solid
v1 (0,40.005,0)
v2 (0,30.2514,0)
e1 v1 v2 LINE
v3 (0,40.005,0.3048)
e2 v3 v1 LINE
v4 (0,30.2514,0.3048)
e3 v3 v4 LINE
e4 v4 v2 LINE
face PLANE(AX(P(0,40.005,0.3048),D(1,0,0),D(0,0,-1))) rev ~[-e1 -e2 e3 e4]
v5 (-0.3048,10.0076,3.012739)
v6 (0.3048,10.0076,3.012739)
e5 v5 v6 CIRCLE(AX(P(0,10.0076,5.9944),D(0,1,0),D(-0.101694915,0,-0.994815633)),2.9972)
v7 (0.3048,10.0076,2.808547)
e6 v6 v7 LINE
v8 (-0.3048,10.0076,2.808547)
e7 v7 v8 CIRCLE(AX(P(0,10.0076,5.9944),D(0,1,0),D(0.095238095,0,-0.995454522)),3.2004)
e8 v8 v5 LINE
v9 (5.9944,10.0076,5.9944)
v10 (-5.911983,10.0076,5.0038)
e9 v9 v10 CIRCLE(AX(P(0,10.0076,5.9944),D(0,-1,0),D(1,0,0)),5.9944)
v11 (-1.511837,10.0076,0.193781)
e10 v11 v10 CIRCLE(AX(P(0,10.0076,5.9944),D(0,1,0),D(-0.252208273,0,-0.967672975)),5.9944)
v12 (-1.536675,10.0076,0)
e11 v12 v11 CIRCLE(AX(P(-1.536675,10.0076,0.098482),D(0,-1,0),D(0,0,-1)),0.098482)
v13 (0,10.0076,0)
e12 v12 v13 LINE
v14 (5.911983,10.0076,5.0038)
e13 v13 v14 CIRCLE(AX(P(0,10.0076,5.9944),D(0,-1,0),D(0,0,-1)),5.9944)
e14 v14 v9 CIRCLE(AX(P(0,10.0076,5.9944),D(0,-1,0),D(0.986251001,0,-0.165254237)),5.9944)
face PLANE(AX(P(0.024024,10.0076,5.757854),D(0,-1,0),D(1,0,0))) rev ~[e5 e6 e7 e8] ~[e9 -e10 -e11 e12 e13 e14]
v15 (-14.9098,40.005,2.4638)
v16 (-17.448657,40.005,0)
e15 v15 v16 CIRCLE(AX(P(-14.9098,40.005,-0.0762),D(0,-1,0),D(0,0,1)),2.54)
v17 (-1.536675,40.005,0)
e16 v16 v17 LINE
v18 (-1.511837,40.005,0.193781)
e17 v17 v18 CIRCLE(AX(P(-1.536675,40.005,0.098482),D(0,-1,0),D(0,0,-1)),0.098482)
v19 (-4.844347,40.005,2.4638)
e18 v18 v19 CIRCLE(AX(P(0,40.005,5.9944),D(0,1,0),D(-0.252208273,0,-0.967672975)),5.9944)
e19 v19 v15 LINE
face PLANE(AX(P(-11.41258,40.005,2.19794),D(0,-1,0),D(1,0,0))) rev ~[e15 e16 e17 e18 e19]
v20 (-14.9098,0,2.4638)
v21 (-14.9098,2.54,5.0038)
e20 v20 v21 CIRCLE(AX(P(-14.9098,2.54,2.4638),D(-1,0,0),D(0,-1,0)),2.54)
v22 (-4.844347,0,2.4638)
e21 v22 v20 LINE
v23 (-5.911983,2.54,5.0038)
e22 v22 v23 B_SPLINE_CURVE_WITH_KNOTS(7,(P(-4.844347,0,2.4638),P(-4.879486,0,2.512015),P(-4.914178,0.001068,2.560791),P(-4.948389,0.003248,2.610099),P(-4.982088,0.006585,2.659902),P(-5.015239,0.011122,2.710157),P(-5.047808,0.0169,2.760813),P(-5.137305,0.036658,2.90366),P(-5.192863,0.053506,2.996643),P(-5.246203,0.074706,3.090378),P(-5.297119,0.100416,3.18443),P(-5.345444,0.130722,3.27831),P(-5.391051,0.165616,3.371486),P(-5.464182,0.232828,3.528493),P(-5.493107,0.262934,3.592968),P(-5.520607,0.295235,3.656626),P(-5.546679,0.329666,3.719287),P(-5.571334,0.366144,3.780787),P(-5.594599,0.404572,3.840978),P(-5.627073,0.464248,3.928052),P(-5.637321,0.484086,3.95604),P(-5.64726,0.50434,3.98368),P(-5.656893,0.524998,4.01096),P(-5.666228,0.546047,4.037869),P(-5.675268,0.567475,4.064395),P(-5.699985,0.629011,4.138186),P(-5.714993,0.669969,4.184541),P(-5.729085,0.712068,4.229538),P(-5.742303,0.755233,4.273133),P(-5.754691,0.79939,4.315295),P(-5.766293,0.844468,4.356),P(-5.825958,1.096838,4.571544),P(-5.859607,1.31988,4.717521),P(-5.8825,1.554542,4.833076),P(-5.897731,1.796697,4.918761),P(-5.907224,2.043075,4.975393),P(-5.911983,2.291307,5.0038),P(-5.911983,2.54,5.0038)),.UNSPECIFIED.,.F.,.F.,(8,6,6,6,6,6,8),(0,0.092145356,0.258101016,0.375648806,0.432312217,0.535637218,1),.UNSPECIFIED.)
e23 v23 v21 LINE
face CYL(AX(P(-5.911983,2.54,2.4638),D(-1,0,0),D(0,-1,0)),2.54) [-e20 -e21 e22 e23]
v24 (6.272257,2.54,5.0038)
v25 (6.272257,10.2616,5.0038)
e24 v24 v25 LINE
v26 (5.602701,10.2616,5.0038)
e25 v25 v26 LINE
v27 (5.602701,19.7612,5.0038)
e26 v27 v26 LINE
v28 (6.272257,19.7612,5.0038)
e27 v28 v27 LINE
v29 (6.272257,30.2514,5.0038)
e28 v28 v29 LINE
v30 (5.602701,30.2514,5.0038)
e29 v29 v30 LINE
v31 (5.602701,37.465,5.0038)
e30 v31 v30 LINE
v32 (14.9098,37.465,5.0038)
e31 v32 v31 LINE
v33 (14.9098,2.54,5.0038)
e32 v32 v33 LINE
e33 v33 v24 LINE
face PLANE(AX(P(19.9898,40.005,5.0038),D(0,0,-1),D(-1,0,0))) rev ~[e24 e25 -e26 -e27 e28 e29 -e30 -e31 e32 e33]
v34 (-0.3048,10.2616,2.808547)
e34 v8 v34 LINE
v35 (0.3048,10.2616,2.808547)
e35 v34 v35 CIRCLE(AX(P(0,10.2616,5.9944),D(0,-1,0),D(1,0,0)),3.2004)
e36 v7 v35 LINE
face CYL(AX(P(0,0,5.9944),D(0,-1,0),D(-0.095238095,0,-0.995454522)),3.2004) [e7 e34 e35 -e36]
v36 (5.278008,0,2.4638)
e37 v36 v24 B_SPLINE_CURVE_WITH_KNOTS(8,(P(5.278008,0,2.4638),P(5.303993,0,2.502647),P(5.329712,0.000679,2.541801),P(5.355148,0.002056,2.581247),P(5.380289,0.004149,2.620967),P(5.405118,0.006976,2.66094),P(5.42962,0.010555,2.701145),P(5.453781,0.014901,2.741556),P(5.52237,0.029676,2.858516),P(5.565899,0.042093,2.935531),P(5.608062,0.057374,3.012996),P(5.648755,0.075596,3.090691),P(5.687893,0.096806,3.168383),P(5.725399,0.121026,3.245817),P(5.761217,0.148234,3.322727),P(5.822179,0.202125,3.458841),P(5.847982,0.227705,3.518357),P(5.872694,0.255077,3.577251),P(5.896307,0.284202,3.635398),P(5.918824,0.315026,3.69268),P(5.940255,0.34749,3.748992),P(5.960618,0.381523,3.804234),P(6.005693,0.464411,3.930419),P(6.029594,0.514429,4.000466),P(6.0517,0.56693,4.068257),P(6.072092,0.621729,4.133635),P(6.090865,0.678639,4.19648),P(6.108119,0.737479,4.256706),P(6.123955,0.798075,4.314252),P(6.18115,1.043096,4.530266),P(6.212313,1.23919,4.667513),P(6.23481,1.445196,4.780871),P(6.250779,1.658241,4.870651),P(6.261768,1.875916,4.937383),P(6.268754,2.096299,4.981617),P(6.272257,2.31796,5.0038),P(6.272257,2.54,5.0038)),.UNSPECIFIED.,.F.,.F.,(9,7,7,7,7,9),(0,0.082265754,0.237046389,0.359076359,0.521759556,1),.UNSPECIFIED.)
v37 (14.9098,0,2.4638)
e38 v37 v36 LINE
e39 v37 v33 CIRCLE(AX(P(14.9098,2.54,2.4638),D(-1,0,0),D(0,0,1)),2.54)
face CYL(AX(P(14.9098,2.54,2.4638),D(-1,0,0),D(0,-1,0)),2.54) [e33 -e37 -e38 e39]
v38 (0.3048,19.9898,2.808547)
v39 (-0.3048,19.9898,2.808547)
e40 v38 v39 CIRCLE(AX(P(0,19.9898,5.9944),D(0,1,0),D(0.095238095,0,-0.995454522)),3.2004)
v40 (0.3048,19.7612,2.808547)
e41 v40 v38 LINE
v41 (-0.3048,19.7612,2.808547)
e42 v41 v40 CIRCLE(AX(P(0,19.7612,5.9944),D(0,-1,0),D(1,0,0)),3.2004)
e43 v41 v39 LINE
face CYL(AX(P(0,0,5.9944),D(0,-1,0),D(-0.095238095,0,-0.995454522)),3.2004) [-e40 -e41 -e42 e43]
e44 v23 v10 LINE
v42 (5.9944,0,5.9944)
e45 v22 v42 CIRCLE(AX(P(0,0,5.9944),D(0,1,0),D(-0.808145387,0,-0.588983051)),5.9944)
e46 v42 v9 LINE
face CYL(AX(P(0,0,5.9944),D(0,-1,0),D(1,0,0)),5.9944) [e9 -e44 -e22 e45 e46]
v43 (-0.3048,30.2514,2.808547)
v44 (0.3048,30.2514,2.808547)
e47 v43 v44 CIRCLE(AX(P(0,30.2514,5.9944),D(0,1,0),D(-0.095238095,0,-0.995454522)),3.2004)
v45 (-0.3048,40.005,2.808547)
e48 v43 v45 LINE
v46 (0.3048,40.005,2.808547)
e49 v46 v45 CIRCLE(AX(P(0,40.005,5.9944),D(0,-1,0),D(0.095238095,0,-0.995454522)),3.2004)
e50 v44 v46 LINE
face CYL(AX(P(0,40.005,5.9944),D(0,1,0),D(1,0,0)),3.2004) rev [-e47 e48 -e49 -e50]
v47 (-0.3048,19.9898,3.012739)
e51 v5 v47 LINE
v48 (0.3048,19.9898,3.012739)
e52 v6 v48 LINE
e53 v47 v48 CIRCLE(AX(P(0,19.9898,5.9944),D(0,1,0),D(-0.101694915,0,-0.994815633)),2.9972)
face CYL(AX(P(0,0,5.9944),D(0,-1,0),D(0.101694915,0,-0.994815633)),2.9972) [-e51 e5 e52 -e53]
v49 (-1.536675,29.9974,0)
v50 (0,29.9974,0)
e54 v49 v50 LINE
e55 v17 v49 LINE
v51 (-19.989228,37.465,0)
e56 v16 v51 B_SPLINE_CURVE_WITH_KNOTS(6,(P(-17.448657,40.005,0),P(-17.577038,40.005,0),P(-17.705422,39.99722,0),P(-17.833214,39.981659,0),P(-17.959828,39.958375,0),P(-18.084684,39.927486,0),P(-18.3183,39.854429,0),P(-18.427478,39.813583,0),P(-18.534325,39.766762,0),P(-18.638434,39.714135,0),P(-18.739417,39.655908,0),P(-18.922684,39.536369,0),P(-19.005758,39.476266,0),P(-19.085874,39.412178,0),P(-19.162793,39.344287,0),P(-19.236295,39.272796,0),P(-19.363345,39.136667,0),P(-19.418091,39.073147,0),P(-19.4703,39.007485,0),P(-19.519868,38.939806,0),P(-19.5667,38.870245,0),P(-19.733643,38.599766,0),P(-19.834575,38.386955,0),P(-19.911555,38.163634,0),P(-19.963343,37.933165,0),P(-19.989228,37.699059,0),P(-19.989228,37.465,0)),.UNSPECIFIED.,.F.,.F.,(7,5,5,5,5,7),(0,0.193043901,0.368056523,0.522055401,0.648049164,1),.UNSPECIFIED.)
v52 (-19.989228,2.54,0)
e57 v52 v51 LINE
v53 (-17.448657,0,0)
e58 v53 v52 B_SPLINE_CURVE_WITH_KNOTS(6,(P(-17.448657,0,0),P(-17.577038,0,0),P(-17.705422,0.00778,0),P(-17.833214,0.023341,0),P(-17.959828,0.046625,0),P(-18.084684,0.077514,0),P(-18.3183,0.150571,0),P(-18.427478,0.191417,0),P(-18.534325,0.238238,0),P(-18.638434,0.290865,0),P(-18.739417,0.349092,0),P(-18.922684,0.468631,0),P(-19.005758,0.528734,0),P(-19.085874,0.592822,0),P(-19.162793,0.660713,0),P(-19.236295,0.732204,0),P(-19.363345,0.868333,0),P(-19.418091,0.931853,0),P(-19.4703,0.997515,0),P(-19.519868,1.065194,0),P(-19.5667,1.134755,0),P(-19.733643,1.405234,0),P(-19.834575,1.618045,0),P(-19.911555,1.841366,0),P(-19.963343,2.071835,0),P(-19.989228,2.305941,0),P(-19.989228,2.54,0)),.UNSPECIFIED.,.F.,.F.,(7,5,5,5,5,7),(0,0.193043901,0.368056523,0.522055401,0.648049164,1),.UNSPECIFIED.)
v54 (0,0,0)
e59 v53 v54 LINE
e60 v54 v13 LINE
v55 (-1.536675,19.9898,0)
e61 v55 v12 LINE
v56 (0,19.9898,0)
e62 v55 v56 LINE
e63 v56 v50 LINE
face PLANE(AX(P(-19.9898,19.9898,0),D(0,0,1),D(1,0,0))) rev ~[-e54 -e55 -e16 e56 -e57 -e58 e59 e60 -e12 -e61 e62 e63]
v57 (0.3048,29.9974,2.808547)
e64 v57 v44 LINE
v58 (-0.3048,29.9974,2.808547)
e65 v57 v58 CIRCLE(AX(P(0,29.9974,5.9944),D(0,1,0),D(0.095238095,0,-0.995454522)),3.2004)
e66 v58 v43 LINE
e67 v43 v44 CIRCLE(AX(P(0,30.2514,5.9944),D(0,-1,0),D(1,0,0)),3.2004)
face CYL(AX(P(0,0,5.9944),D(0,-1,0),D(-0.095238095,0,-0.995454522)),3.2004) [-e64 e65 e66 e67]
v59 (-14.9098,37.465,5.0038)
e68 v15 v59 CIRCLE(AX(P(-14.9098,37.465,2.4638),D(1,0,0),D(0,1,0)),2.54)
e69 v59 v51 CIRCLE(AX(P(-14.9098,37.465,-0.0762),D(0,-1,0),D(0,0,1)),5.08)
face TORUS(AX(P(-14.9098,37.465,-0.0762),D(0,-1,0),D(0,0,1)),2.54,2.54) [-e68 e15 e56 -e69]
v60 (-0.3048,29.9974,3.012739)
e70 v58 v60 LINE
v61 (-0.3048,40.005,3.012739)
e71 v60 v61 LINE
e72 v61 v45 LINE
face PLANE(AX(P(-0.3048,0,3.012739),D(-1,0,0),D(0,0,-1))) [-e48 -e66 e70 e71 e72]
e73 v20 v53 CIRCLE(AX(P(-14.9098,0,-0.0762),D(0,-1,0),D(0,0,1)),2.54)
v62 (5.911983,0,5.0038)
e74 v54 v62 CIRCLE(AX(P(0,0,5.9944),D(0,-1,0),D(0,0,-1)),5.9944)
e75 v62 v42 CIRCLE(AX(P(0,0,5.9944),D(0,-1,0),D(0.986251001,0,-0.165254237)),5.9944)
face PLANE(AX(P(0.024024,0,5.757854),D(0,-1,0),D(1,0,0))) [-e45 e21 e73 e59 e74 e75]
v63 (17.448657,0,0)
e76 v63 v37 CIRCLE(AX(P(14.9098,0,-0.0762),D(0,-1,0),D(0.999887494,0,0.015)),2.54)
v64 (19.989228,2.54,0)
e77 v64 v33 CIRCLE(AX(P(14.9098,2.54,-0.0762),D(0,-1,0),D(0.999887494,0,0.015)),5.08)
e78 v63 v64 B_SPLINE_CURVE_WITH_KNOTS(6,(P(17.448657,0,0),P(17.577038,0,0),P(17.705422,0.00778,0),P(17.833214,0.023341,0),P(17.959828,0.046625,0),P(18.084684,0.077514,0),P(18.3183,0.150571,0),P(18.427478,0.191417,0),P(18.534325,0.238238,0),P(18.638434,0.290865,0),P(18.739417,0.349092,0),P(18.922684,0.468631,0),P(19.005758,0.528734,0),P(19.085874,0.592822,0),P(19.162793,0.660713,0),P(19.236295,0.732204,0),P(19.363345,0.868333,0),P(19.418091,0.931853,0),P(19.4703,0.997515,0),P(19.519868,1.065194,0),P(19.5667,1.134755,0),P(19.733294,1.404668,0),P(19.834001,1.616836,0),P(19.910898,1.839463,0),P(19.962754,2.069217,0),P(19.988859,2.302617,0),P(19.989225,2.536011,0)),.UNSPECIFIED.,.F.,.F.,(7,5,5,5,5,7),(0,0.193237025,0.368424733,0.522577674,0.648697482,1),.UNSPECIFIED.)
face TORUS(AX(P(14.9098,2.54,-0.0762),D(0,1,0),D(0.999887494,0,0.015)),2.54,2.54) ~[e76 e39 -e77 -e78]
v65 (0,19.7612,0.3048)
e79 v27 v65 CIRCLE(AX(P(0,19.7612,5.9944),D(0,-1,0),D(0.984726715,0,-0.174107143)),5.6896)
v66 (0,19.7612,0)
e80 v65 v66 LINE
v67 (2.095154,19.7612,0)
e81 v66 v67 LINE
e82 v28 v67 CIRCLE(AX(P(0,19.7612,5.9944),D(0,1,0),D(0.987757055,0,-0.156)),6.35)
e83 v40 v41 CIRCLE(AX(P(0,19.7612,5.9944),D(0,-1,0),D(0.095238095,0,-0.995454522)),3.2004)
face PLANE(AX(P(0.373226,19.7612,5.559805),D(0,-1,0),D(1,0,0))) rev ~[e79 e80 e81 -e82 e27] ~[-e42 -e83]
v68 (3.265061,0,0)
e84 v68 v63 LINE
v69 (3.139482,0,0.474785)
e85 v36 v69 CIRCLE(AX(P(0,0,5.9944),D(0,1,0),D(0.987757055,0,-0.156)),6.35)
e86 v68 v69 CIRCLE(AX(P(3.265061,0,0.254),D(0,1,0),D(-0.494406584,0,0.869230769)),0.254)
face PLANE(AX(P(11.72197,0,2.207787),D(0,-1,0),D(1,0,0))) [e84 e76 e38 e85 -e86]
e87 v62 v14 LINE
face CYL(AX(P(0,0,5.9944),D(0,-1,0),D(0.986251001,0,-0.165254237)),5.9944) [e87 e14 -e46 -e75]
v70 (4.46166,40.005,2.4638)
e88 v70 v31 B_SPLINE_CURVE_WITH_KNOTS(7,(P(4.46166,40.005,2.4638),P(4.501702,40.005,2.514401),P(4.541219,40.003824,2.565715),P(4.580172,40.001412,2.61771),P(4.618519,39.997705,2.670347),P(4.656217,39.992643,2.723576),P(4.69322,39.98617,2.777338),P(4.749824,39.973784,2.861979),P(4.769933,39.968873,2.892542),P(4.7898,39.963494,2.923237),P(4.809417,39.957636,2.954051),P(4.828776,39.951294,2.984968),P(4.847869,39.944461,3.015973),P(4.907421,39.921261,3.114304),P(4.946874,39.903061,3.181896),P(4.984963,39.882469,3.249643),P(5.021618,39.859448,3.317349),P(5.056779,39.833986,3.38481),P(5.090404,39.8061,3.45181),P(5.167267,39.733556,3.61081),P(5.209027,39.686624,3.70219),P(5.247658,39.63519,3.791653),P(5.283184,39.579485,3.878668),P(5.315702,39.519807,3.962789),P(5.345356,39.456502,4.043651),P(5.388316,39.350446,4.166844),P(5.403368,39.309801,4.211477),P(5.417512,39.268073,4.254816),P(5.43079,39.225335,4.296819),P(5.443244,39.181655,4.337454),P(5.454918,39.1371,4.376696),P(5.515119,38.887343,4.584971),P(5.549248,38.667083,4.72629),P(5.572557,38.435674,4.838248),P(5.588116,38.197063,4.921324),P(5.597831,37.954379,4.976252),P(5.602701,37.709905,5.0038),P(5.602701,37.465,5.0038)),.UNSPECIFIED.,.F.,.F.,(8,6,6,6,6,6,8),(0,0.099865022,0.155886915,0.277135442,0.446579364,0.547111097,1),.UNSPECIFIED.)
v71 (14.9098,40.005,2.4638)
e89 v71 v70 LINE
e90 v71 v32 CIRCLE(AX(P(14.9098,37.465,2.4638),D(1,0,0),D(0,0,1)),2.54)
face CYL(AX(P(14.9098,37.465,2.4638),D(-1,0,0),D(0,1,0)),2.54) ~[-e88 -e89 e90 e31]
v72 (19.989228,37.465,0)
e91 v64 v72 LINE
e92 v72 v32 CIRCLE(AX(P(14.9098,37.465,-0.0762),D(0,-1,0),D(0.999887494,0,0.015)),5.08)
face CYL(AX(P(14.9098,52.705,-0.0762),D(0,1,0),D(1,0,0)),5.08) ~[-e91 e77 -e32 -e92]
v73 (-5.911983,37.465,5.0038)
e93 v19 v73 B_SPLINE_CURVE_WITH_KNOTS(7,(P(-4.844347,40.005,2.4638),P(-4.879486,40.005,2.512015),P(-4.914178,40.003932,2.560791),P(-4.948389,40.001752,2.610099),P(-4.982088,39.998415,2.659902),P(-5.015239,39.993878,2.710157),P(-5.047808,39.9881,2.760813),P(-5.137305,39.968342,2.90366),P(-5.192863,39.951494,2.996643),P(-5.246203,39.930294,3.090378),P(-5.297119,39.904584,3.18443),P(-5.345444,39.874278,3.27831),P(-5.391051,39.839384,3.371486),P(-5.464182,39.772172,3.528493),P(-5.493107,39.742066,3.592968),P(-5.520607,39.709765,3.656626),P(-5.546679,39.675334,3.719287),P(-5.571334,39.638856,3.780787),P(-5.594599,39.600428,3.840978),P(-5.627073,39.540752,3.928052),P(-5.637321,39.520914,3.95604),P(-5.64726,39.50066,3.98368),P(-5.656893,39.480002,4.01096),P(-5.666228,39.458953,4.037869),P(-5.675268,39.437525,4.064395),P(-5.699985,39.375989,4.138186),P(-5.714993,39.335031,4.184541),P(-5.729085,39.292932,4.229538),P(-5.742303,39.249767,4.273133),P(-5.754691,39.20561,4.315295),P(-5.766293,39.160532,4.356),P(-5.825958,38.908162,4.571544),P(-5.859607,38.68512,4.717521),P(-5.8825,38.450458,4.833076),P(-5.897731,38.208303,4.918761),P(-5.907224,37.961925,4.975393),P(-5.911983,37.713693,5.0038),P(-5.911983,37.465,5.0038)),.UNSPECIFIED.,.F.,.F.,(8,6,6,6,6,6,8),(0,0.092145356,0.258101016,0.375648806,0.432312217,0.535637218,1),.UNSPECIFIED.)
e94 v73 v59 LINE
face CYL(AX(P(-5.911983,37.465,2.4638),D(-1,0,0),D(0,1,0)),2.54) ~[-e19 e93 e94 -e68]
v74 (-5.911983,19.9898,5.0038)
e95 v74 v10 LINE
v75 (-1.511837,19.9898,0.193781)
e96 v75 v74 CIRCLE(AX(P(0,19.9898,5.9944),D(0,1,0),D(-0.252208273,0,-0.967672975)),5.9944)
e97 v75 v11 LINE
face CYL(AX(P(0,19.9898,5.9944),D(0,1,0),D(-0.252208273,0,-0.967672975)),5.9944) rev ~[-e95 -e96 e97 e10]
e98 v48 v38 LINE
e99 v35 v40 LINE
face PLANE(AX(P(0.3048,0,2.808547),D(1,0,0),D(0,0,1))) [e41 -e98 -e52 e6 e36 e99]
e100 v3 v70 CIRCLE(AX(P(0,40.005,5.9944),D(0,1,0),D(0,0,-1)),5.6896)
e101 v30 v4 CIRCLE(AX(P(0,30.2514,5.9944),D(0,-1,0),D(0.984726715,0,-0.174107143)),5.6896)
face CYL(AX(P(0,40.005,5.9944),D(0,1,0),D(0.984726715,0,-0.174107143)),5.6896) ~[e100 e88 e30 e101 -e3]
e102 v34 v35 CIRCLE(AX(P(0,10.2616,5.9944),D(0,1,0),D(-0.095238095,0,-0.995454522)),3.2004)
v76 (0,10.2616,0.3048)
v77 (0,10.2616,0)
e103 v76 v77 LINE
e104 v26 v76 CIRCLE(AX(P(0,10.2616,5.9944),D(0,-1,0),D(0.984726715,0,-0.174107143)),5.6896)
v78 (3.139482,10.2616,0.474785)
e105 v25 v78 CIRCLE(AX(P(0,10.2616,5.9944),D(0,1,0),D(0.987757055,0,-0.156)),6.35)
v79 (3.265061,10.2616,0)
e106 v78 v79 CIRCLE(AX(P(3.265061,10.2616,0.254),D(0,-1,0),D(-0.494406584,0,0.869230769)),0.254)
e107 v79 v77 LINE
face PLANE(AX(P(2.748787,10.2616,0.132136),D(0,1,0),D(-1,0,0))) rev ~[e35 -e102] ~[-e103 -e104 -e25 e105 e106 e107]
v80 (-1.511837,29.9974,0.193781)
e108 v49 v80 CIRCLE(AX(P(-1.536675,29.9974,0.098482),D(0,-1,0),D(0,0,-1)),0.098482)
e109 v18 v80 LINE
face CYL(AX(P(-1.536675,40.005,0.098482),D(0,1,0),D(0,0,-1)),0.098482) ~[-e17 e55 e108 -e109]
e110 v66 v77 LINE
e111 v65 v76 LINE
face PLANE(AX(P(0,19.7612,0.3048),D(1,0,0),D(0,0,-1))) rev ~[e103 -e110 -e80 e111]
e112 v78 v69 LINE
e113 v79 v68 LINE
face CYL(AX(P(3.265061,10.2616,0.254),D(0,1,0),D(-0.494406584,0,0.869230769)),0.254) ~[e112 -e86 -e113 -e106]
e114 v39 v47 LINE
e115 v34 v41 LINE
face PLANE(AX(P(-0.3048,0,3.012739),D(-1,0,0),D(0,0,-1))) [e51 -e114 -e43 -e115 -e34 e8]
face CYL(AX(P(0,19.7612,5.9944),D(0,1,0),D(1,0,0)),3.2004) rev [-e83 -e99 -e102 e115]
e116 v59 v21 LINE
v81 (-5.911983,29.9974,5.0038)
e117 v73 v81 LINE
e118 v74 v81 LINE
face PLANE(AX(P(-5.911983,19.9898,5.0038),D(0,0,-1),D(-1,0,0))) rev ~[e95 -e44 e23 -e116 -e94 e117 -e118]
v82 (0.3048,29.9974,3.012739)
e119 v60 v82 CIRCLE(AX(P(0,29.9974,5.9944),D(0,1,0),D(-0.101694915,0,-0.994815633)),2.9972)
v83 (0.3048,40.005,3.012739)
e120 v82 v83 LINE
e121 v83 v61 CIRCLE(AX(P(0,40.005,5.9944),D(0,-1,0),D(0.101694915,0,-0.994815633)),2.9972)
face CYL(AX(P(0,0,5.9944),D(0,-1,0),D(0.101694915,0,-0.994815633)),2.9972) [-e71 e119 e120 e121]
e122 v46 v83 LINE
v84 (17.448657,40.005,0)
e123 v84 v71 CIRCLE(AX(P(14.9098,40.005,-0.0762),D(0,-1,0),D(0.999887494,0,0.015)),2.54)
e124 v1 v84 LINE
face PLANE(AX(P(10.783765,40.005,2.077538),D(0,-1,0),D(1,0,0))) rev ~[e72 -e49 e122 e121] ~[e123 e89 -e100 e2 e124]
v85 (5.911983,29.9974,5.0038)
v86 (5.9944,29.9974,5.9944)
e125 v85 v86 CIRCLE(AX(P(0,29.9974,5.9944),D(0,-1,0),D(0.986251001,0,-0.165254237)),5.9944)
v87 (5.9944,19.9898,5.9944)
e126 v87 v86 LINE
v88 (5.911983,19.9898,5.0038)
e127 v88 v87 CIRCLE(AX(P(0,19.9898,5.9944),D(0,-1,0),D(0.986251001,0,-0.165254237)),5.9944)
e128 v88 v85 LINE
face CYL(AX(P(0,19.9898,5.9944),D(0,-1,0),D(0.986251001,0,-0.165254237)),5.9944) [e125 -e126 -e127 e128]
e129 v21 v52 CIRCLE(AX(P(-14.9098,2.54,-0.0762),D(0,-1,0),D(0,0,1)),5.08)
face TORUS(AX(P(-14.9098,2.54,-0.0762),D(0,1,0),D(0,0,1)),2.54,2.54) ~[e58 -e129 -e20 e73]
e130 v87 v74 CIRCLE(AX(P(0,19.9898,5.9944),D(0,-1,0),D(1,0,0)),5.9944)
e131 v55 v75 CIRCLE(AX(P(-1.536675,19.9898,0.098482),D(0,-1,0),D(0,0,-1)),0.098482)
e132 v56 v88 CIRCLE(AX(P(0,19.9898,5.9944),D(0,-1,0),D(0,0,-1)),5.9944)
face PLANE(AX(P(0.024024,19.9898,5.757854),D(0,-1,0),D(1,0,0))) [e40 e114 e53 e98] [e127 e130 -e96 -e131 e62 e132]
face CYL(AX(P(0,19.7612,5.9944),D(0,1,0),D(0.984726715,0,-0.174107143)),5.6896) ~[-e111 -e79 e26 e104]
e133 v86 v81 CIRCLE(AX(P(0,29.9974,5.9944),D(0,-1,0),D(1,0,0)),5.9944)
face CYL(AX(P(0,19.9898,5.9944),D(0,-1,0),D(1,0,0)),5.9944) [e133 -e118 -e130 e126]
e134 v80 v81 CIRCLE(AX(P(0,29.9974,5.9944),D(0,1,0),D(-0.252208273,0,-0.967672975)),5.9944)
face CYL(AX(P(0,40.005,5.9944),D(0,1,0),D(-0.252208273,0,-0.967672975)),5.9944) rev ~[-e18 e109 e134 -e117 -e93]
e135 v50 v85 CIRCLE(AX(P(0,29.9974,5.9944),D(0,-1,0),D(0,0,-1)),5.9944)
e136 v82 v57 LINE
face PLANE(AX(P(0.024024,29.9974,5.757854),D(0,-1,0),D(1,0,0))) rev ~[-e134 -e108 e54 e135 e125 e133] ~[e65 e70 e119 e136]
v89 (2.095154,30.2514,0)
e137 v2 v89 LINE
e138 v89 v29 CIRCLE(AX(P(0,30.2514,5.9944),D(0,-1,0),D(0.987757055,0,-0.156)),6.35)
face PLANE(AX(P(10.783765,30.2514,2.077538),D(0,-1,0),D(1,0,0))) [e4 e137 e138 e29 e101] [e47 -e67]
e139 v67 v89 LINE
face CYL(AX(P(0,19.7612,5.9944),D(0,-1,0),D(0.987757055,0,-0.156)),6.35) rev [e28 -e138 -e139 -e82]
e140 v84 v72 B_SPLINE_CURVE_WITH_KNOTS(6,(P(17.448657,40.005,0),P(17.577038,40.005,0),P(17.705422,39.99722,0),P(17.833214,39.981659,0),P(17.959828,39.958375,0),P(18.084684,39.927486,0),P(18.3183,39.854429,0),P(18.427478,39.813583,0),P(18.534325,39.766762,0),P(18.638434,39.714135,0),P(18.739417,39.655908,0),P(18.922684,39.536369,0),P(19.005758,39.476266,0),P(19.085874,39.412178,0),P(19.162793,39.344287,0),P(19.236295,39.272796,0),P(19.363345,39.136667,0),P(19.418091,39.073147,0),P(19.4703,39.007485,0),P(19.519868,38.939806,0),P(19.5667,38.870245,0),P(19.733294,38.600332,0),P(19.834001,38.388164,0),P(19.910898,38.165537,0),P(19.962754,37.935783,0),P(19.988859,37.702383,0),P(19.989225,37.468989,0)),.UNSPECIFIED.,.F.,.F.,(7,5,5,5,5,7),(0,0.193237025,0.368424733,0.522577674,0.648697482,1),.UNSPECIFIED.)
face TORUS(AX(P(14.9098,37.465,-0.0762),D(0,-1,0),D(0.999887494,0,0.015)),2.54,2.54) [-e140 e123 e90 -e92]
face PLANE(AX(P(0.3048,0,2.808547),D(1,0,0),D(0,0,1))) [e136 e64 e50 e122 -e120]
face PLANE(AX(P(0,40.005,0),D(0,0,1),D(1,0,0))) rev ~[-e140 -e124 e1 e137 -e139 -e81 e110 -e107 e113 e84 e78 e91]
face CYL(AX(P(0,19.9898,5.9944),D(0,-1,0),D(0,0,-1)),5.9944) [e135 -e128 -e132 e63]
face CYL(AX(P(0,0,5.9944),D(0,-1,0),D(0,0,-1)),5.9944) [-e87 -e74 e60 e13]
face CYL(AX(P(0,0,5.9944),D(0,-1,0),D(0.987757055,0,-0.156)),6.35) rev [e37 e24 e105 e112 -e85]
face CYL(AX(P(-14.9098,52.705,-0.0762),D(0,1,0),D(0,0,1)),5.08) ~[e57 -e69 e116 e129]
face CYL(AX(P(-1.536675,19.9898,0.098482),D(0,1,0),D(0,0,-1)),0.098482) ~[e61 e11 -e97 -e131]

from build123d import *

# Parameters (mm, degrees)
F3_DEPTH     = 10.0076
F4_DEPTH     = 40.005
F6_START     = -19.9898
F6_DEPTH     = 10.0076
F7_DEPTH     = 10.0076
F9_START     = 20.2438
F2_R         = 3.2004
F9_DEPTH     = 9.4996
F10_DEPTH    = 10.2616
F11_START    = 20.0152
F11_DEPTH    = 9.9822
F12_START    = -19.7612
F12_DEPTH    = 11.6078
F13_DEPTH    = 9.7536
F14_T1_DEPTH = 13.1863686745
F15_T1_DEPTH = 65.405
F16_R        = 2.54


# Not quite as in the source:
# - a fillet or chamfer that OpenCascade refuses, or shapes differently, is made with other operations: its cross-section is extruded or revolved along the edge and cut away or added


with BuildPart() as f3:
    # F0 (on Front) → F3 (new body)
    with BuildSketch(Plane.XZ):
        with BuildLine():
            ThreePointArc((-5.9119830007, 5.0038), (-3.8726462994, 1.4188735822), (0, 0))
            ThreePointArc((0, 0), (3.8726462994, 1.4188735822), (5.9119830007, 5.0038))
            ThreePointArc((5.9119830007, 5.0038), (5.9737602169, 5.4973887019), (5.9944, 5.9944))
            ThreePointArc((5.9944, 5.9944), (-0.4970112981, 11.9681602169), (-5.9119830007, 5.0038))
        make_face()
        with BuildLine():
            ThreePointArc((-0.3048, 3.0127385839), (0, 8.9916), (0.3048, 3.0127385839))
            Line((0.3048, 3.0127385839), (0.3048, 2.808547348))
            ThreePointArc((0.3048, 2.808547348), (0, 2.794), (-0.3048, 2.808547348))
            Line((-0.3048, 2.808547348), (-0.3048, 3.0127385839))
        make_face(mode=Mode.SUBTRACT)
        with BuildLine():
            Line((-19.9898, 0), (0, 0))
            ThreePointArc((0, 0), (-3.8726462994, 1.4188735822), (-5.9119830007, 5.0038))
            Line((-5.9119830007, 5.0038), (-19.9898, 5.0038))
            Line((-19.9898, 5.0038), (-19.9898, 0))
        make_face()
    extrude(amount=-F3_DEPTH)

    # F0 (on Front) → F4 (join)
    with BuildSketch(Plane.XZ):
        with BuildLine():
            Line((0.3048, 2.808547348), (0.3048, 3.0127385839))
            ThreePointArc((0.3048, 3.0127385839), (0, 8.9916), (-0.3048, 3.0127385839))
            Line((-0.3048, 3.0127385839), (-0.3048, 2.808547348))
            ThreePointArc((-0.3048, 2.808547348), (0, 2.794), (0.3048, 2.808547348))
        make_face()
    extrude(amount=-F4_DEPTH)

    # F0 (on Front) → F6 (join)
    with BuildSketch(Plane.XZ.offset(F6_START)):
        with BuildLine():
            ThreePointArc((-5.9119830007, 5.0038), (-3.8726462994, 1.4188735822), (0, 0))
            ThreePointArc((0, 0), (3.8726462994, 1.4188735822), (5.9119830007, 5.0038))
            ThreePointArc((5.9119830007, 5.0038), (5.9737602169, 5.4973887019), (5.9944, 5.9944))
            ThreePointArc((5.9944, 5.9944), (-0.4970112981, 11.9681602169), (-5.9119830007, 5.0038))
        make_face()
        with BuildLine():
            ThreePointArc((-0.3048, 3.0127385839), (0, 8.9916), (0.3048, 3.0127385839))
            Line((0.3048, 3.0127385839), (0.3048, 2.808547348))
            ThreePointArc((0.3048, 2.808547348), (0, 2.794), (-0.3048, 2.808547348))
            Line((-0.3048, 2.808547348), (-0.3048, 3.0127385839))
        make_face(mode=Mode.SUBTRACT)
        with BuildLine():
            Line((-19.9898, 0), (0, 0))
            ThreePointArc((0, 0), (-3.8726462994, 1.4188735822), (-5.9119830007, 5.0038))
            Line((-5.9119830007, 5.0038), (-19.9898, 5.0038))
            Line((-19.9898, 5.0038), (-19.9898, 0))
        make_face()
    extrude(amount=-F6_DEPTH)

    # F2 (on offset) → F7 (join)
    with BuildSketch(Plane.XZ.offset(-40.005)):
        with BuildLine():
            ThreePointArc((-1.5118372742, 0.1937811178), (-4.4229342387, 1.9483545134), (-5.9119830007, 5.0038))
            Line((-5.9119830007, 5.0038), (-19.9898, 5.0038))
            Line((-19.9898, 5.0038), (-19.9898, 0))
            Line((-19.9898, 0), (-1.5366753453, 0))
            ThreePointArc((-1.5366753453, 0), (-1.4389921182, 0.0859617436), (-1.5118372742, 0.1937811178))
        make_face()
    extrude(amount=F7_DEPTH)

    # F2 (on offset) → F9 (join)
    with BuildSketch(Plane.XZ.offset(-40.005).offset(F9_START)):
        with BuildLine():
            Line((0, 0.3048), (0, 0))
            ThreePointArc((0, 0), (3.8726462994, 1.4188735822), (5.9119830007, 5.0038))
            Line((5.9119830007, 5.0038), (5.6027011164, 5.0038))
            ThreePointArc((5.6027011164, 5.0038), (-3.6561886166, 10.353738592), (0, 0.3048))
        make_face()
        with Locations((0, 5.9944)):
            Circle(F2_R, mode=Mode.SUBTRACT)
        with BuildLine():
            ThreePointArc((5.9119830007, 5.0038), (3.8726462994, 1.4188735822), (0, 0))
            Line((0, 0), (19.9898, 0))
            Line((19.9898, 0), (19.9898, 5.0038))
            Line((19.9898, 5.0038), (5.9119830007, 5.0038))
        make_face()
    extrude(amount=F9_DEPTH)

    # F0 (on Front) → F10 (join)
    with BuildSketch(Plane.XZ):
        with BuildLine():
            ThreePointArc((6.2722573002, 5.0038), (4.8747199854, 1.9250505355), (2.0951536077, 0))
            Line((2.0951536077, 0), (19.9898, 0))
            Line((19.9898, 0), (19.9898, 5.0038))
            Line((19.9898, 5.0038), (6.2722573002, 5.0038))
        make_face()
    extrude(amount=-F10_DEPTH)

    # F2 (on offset) → F11 (join)
    with BuildSketch(Plane.XZ.offset(-40.005).offset(F11_START)):
        with BuildLine():
            ThreePointArc((-1.5118372742, 0.1937811178), (-4.4229342387, 1.9483545134), (-5.9119830007, 5.0038))
            Line((-5.9119830007, 5.0038), (-19.9898, 5.0038))
            Line((-19.9898, 5.0038), (-19.9898, 0))
            Line((-19.9898, 0), (-1.5366753453, 0))
            ThreePointArc((-1.5366753453, 0), (-1.4389921182, 0.0859617436), (-1.5118372742, 0.1937811178))
        make_face()
    extrude(amount=F11_DEPTH)

    # F0 (on Front) → F12 (join)
    with BuildSketch(Plane.XZ.offset(F12_START)):
        with BuildLine():
            ThreePointArc((6.2722573002, 5.0038), (4.8747199854, 1.9250505355), (2.0951536077, 0))
            Line((2.0951536077, 0), (19.9898, 0))
            Line((19.9898, 0), (19.9898, 5.0038))
            Line((19.9898, 5.0038), (6.2722573002, 5.0038))
        make_face()
    extrude(amount=-F12_DEPTH)

    # F2 (on offset) → F13 (join)
    with BuildSketch(Plane.XZ.offset(-40.005)):
        with BuildLine():
            ThreePointArc((5.9119830007, 5.0038), (3.8726462994, 1.4188735822), (0, 0))
            Line((0, 0), (19.9898, 0))
            Line((19.9898, 0), (19.9898, 5.0038))
            Line((19.9898, 5.0038), (5.9119830007, 5.0038))
        make_face()
        with BuildLine():
            Line((0, 0.3048), (0, 0))
            ThreePointArc((0, 0), (3.8726462994, 1.4188735822), (5.9119830007, 5.0038))
            Line((5.9119830007, 5.0038), (5.6027011164, 5.0038))
            ThreePointArc((5.6027011164, 5.0038), (-3.6561886166, 10.353738592), (0, 0.3048))
        make_face()
        with Locations((0, 5.9944)):
            Circle(F2_R, mode=Mode.SUBTRACT)
    extrude(amount=F13_DEPTH)

    # F14: fillet of radius 0.254 on 1 edges, made by hand

    # F14_s2 → F14_t1 (cut)
    with BuildSketch(Plane.XZ.offset(-10.2616)):
        with BuildLine():
            ThreePointArc((3.1394818053, 0.4747846154), (3.0195052872, 0.1890511444), (3.2650610775, 0))
            Line((3.2650610775, 0), (2.0951536077, 0))
            ThreePointArc((2.0951536077, 0), (2.628061469, 0.2137605098), (3.1394818053, 0.4747846154))
        make_face()
    extrude(amount=F14_T1_DEPTH, mode=Mode.SUBTRACT)

    # F15: fillet of radius 5.08 on 2 edges, made by hand

    # F15_s2 → F15_t1 (cut)
    with BuildSketch(Plane.XZ.offset(-52.705)):
        with BuildLine():
            ThreePointArc((-14.9098, 5.0038), (-18.5019024484, 3.5159024484), (-19.9898, -0.0762))
            Line((-19.9898, -0.0762), (-19.9898, 5.0038))
            Line((-19.9898, 5.0038), (-14.9098, 5.0038))
        make_face()
        with BuildLine():
            ThreePointArc((19.9898, -0.0762), (18.5019024484, 3.5159024484), (14.9098, 5.0038))
            Line((14.9098, 5.0038), (19.9898, 5.0038))
            Line((19.9898, 5.0038), (19.9898, -0.0762))
        make_face()
    extrude(amount=F15_T1_DEPTH, mode=Mode.SUBTRACT)

    # F16
    f16_edges = [f3.edges().sort_by_distance(p)[0] for p in [
        (10.256251, 40.005, 5.0038),
        (-10.410892, 40.005, 5.0038),
        (-10.410892, 0, 5.0038),
        (10.591029, 0, 5.0038),
        (-18.47486, 0, 3.542743),
        (-18.47486, 40.005, 3.542743),
        (18.47486, 40.005, 3.542743),
        (18.47486, 0, 3.542743),
    ]]
    fillet(f16_edges, radius=F16_R)


solid = f3.part
